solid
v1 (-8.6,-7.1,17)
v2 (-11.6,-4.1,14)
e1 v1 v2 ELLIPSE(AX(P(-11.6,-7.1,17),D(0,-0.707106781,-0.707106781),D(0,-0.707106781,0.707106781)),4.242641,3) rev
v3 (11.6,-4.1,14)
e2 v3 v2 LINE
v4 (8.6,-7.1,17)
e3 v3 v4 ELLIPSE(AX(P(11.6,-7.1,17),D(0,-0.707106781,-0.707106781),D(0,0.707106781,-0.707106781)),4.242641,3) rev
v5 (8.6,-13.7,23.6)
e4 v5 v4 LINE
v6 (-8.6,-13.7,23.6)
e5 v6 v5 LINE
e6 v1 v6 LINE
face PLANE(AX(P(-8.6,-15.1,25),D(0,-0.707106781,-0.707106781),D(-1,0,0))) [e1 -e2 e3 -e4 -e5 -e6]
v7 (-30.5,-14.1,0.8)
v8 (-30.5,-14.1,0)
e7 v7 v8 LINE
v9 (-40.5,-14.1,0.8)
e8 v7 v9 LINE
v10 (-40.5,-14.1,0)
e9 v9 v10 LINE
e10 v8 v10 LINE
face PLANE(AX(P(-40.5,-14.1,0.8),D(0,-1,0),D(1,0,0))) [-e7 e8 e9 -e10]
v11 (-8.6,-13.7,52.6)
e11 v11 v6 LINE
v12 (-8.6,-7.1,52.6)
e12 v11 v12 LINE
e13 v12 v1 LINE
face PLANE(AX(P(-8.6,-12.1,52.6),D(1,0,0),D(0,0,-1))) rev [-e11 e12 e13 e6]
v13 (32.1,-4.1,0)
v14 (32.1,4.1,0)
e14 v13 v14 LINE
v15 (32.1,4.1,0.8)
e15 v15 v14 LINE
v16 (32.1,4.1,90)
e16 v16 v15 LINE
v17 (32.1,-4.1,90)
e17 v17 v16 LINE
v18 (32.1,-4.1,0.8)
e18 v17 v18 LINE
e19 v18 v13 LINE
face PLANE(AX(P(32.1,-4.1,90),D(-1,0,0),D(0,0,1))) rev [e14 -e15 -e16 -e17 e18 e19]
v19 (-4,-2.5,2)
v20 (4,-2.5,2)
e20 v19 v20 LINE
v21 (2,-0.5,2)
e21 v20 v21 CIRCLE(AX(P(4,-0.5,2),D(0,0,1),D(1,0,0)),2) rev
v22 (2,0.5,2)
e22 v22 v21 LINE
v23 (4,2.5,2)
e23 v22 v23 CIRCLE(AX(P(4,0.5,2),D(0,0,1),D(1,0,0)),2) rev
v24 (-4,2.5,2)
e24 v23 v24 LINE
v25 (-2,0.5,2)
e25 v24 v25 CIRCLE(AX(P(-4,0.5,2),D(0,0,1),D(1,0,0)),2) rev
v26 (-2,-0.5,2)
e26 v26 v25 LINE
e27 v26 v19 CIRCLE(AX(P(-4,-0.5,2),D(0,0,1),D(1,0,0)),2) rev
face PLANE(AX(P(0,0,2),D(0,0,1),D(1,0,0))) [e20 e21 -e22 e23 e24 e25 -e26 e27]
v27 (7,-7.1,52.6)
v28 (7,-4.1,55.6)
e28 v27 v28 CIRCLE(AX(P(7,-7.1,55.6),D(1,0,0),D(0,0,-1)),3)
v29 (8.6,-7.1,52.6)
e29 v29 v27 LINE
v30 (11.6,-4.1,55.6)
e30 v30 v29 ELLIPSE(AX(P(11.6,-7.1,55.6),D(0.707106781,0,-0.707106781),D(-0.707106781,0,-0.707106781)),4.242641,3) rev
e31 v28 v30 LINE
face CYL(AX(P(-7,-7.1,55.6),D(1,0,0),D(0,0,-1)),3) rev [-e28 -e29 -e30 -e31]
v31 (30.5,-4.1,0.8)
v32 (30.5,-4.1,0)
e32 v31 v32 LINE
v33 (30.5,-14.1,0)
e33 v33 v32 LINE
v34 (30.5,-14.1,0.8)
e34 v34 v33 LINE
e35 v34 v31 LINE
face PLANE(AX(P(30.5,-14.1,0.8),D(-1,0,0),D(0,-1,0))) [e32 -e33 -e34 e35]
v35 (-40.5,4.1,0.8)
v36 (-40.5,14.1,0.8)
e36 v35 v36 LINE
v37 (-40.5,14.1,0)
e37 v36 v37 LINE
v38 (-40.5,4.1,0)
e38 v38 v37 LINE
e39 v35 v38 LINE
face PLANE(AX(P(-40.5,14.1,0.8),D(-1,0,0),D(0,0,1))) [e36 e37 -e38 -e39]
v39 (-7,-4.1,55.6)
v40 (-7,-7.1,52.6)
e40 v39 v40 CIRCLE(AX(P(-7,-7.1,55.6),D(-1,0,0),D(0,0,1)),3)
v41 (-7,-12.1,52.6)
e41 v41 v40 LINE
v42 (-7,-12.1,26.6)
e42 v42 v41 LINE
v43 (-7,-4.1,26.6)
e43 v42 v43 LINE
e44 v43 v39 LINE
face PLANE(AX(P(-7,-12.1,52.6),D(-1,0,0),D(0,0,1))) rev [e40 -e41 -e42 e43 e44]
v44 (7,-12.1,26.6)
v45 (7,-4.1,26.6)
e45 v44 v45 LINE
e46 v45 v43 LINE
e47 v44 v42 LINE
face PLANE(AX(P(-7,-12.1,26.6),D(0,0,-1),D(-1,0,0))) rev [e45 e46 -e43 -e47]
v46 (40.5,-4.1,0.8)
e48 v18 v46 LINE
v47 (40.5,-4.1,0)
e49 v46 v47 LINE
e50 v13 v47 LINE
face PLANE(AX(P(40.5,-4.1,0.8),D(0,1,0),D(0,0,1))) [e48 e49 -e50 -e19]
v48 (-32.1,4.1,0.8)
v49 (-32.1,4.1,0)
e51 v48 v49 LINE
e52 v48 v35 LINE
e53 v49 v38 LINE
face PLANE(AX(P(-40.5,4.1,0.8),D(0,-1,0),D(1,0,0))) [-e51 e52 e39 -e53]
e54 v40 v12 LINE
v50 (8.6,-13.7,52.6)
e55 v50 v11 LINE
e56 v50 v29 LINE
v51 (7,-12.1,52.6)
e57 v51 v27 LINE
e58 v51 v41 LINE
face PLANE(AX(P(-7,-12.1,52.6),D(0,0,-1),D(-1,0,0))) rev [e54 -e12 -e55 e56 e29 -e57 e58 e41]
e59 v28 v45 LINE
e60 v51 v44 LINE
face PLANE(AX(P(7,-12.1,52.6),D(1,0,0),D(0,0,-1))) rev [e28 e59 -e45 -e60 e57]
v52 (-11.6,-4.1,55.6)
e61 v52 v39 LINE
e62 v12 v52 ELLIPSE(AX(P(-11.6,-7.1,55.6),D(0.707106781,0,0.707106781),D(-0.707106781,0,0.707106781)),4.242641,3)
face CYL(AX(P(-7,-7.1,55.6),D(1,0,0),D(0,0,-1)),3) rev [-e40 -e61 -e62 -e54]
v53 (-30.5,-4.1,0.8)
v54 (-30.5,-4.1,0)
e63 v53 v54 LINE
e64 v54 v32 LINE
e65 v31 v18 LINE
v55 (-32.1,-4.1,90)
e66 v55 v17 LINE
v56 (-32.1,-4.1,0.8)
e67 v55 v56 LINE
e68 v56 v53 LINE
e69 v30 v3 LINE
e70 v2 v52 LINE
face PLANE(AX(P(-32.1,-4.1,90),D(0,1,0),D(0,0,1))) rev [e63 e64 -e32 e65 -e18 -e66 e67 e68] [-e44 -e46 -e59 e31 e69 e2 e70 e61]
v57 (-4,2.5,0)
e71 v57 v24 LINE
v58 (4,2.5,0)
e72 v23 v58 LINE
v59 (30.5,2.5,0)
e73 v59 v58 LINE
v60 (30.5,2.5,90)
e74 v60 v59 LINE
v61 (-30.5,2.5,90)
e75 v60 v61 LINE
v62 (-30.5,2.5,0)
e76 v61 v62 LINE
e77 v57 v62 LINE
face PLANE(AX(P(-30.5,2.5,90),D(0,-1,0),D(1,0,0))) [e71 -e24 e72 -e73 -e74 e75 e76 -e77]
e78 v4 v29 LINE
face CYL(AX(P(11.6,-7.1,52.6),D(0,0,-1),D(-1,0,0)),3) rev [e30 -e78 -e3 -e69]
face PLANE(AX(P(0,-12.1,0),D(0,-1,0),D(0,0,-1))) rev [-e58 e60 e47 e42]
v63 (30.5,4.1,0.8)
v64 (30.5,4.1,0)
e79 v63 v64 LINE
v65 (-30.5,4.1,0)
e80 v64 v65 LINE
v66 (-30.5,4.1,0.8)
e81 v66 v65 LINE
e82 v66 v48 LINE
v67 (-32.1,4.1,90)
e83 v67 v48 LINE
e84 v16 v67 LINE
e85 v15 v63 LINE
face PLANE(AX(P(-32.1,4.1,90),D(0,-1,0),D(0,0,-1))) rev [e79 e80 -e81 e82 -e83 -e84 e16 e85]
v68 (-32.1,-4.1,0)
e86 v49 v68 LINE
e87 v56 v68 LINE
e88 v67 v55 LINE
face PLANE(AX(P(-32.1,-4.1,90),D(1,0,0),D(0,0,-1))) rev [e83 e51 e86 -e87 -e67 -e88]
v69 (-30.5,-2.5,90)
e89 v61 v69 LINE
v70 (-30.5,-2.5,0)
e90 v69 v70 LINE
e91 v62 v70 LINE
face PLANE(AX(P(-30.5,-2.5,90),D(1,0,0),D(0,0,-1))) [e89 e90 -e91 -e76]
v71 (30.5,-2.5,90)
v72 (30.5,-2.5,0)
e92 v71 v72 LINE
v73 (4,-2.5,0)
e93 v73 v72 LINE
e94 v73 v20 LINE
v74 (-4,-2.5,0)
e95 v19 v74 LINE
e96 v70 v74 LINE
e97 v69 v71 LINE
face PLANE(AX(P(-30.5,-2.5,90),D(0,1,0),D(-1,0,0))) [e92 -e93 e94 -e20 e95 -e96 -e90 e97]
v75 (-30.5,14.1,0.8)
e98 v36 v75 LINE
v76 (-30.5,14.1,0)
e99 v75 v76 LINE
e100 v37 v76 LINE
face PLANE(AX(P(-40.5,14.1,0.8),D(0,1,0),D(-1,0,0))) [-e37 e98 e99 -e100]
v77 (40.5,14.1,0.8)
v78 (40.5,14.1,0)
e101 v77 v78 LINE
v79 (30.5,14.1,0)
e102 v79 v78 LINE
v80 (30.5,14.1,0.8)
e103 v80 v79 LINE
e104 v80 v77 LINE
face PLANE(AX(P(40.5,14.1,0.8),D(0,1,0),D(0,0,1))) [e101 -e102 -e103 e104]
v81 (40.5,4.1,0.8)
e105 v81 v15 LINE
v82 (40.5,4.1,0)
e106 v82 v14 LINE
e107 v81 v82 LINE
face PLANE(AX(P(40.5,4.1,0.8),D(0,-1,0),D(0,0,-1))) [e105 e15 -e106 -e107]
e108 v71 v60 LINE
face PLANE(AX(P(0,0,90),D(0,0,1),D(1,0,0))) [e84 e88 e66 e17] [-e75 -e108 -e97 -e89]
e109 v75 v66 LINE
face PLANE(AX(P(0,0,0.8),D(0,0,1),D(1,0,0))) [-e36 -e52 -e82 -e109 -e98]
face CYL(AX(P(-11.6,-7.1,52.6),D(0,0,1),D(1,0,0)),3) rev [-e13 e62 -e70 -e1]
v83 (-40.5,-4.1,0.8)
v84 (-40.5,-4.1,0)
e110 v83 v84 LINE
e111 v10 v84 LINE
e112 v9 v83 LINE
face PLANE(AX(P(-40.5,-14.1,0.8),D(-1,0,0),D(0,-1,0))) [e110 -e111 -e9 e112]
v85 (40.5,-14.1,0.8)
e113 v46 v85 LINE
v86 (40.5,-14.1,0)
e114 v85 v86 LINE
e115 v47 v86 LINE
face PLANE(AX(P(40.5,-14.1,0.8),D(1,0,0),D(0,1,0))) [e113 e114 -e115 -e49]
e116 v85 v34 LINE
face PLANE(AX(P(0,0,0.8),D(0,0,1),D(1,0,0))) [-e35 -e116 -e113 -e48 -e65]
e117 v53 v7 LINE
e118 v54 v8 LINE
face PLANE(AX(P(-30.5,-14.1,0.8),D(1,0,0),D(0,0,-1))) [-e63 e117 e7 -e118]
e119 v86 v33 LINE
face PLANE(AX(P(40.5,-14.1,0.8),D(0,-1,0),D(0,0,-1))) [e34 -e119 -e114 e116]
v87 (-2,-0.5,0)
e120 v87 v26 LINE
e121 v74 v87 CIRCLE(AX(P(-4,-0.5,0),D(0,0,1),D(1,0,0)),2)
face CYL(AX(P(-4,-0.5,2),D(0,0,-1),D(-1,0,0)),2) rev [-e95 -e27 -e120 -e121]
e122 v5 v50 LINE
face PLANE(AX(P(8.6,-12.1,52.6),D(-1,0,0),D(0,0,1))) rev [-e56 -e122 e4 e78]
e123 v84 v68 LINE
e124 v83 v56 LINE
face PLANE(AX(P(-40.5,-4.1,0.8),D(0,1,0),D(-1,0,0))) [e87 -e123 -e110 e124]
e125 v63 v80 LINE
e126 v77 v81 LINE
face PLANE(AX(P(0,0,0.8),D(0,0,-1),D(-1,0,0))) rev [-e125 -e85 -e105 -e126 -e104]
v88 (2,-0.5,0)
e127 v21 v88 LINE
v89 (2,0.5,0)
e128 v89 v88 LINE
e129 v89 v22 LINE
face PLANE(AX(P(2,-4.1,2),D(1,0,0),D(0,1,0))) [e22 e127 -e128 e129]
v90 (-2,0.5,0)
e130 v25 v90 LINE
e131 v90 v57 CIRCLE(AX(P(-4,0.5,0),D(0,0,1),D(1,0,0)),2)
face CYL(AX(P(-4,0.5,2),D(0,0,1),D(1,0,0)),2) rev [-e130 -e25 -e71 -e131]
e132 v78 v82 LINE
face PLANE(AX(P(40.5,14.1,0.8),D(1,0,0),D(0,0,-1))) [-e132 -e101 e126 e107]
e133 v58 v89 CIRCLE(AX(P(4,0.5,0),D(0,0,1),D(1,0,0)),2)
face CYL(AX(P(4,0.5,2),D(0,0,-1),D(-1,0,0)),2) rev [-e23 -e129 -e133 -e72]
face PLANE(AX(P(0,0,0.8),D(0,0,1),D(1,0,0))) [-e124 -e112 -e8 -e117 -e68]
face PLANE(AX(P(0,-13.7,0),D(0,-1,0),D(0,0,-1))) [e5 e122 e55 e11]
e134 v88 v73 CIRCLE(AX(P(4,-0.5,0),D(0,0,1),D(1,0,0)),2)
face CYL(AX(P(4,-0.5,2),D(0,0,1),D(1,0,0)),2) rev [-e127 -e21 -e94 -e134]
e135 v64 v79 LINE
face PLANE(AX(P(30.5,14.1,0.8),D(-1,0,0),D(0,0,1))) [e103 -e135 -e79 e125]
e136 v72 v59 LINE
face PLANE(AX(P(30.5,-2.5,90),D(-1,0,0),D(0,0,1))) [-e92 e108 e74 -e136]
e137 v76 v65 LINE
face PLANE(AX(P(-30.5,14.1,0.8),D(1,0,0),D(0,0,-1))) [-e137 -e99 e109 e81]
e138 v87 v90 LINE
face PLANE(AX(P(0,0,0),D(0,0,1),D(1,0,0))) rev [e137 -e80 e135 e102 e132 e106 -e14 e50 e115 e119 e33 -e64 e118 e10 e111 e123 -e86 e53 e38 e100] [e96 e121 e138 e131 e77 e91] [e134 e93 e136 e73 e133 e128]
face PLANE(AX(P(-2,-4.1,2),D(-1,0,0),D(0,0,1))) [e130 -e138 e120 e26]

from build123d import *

# Parameters (mm, degrees)
SKETCH1_W           = 64.2
SKETCH1_H           = 8.2
SKETCH1_W_2         = 61
SKETCH1_H_2         = 5
BOSS_EXTRUDE1_DEPTH = 90
SKETCH2_W           = 4
SKETCH2_H           = 8.2
BOSS_EXTRUDE2_DEPTH = 2
BOSS_EXTRUDE4_DEPTH = 8
SKETCH5_W           = 17.2
SKETCH5_H           = 27.6
BOSS_EXTRUDE5_DEPTH = 1.6
CHAMFER3_SIZE       = 11
FILLET1_R           = 3
FILLET2_R           = 2
FILLET3_R           = 3
SKETCH3_W           = 10
SKETCH3_H           = 10
BOSS_EXTRUDE3_DEPTH = 0.8


with BuildPart() as part:
    # Sketch1 → Boss-Extrude1 (new body)
    with BuildSketch(Plane.XY):
        Rectangle(SKETCH1_W, SKETCH1_H)
        Rectangle(SKETCH1_W_2, SKETCH1_H_2, mode=Mode.SUBTRACT)
    extrude(amount=BOSS_EXTRUDE1_DEPTH)

    # Sketch2 → Boss-Extrude2 (add)
    with BuildSketch(Plane(origin=(0, 0, 0), x_dir=(-1, 0, 0), z_dir=(0, 0, -1))):
        Rectangle(SKETCH2_W, SKETCH2_H)
    extrude(amount=-BOSS_EXTRUDE2_DEPTH)

    # Sketch4 → Boss-Extrude4 (add)
    with BuildSketch(Plane.XZ.offset(4.1)):
        Polygon((-7, 52.6), (-7, 26.6), (7, 26.6), (7, 52.6), (8.6, 52.6), (8.6, 25), (-8.6, 25), (-8.6, 52.6), align=None)
    extrude(amount=BOSS_EXTRUDE4_DEPTH)

    # Sketch5 → Boss-Extrude5 (add)
    with BuildSketch(Plane.XZ.offset(12.1)):
        with Locations((0, 38.8)):
            Rectangle(SKETCH5_W, SKETCH5_H)
    extrude(amount=BOSS_EXTRUDE5_DEPTH)

    # Chamfer3
    # the kernel refuses this chamfer: 11 mm, written as the material it adds along each edge
    with BuildSketch(Plane(origin=(8.6, -4.1, 25), x_dir=(0, 0.027495876610586372, -0.9996219169112968), z_dir=(-1, 0, 0))) as chamfer3_piece_1_section:
        Polygon((CHAMFER3_SIZE * 0.999621916911, CHAMFER3_SIZE * 0.0274958766106), (-CHAMFER3_SIZE * 0.0274958766106, CHAMFER3_SIZE * 0.999621916911), (0, 0), align=None)
    chamfer3_piece_1 = extrude(amount=17.2, mode=Mode.PRIVATE)
    chamfer3_piece_1 = split(chamfer3_piece_1, bisect_by=Plane(origin=(0, -13.7, 21.279882352), z_dir=(0, 1, 0)), keep=Keep.TOP, mode=Mode.PRIVATE)
    add(chamfer3_piece_1)

    # Fillet1
    fillet1_edges = [part.edges().sort_by_distance(p)[0] for p in [
        (-8.6, -4.1, 33.3),
        (8.6, -4.1, 33.3),
    ]]
    fillet(fillet1_edges, radius=FILLET1_R)

    # Fillet2
    fillet2_edges = [part.edges().sort_by_distance(p)[0] for p in [
        (2, -2.5, 1),
        (-2, -2.5, 1),
        (-2, 2.5, 1),
        (2, 2.5, 1),
    ]]
    fillet(fillet2_edges, radius=FILLET2_R)

    # Fillet3
    fillet3_edges = [part.edges().sort_by_distance(p)[0] for p in [
        (-9.3, -4.1, 52.6),
        (9.3, -4.1, 52.6),
    ]]
    fillet(fillet3_edges, radius=FILLET3_R)

    # Sketch3 → Boss-Extrude3 (add)
    with BuildSketch(Plane(origin=(0, 0, 0), x_dir=(-1, 0, 0), z_dir=(0, 0, -1))):
        with Locations((-35.5, 9.1)):
            Rectangle(SKETCH3_W, SKETCH3_H)
        with Locations((35.5, 9.1)):
            Rectangle(SKETCH3_W, SKETCH3_H)
        with Locations((35.5, -9.1)):
            Rectangle(SKETCH3_W, SKETCH3_H)
        with Locations((-35.5, -9.1)):
            Rectangle(SKETCH3_W, SKETCH3_H)
    extrude(amount=-BOSS_EXTRUDE3_DEPTH)


solid = part.part
